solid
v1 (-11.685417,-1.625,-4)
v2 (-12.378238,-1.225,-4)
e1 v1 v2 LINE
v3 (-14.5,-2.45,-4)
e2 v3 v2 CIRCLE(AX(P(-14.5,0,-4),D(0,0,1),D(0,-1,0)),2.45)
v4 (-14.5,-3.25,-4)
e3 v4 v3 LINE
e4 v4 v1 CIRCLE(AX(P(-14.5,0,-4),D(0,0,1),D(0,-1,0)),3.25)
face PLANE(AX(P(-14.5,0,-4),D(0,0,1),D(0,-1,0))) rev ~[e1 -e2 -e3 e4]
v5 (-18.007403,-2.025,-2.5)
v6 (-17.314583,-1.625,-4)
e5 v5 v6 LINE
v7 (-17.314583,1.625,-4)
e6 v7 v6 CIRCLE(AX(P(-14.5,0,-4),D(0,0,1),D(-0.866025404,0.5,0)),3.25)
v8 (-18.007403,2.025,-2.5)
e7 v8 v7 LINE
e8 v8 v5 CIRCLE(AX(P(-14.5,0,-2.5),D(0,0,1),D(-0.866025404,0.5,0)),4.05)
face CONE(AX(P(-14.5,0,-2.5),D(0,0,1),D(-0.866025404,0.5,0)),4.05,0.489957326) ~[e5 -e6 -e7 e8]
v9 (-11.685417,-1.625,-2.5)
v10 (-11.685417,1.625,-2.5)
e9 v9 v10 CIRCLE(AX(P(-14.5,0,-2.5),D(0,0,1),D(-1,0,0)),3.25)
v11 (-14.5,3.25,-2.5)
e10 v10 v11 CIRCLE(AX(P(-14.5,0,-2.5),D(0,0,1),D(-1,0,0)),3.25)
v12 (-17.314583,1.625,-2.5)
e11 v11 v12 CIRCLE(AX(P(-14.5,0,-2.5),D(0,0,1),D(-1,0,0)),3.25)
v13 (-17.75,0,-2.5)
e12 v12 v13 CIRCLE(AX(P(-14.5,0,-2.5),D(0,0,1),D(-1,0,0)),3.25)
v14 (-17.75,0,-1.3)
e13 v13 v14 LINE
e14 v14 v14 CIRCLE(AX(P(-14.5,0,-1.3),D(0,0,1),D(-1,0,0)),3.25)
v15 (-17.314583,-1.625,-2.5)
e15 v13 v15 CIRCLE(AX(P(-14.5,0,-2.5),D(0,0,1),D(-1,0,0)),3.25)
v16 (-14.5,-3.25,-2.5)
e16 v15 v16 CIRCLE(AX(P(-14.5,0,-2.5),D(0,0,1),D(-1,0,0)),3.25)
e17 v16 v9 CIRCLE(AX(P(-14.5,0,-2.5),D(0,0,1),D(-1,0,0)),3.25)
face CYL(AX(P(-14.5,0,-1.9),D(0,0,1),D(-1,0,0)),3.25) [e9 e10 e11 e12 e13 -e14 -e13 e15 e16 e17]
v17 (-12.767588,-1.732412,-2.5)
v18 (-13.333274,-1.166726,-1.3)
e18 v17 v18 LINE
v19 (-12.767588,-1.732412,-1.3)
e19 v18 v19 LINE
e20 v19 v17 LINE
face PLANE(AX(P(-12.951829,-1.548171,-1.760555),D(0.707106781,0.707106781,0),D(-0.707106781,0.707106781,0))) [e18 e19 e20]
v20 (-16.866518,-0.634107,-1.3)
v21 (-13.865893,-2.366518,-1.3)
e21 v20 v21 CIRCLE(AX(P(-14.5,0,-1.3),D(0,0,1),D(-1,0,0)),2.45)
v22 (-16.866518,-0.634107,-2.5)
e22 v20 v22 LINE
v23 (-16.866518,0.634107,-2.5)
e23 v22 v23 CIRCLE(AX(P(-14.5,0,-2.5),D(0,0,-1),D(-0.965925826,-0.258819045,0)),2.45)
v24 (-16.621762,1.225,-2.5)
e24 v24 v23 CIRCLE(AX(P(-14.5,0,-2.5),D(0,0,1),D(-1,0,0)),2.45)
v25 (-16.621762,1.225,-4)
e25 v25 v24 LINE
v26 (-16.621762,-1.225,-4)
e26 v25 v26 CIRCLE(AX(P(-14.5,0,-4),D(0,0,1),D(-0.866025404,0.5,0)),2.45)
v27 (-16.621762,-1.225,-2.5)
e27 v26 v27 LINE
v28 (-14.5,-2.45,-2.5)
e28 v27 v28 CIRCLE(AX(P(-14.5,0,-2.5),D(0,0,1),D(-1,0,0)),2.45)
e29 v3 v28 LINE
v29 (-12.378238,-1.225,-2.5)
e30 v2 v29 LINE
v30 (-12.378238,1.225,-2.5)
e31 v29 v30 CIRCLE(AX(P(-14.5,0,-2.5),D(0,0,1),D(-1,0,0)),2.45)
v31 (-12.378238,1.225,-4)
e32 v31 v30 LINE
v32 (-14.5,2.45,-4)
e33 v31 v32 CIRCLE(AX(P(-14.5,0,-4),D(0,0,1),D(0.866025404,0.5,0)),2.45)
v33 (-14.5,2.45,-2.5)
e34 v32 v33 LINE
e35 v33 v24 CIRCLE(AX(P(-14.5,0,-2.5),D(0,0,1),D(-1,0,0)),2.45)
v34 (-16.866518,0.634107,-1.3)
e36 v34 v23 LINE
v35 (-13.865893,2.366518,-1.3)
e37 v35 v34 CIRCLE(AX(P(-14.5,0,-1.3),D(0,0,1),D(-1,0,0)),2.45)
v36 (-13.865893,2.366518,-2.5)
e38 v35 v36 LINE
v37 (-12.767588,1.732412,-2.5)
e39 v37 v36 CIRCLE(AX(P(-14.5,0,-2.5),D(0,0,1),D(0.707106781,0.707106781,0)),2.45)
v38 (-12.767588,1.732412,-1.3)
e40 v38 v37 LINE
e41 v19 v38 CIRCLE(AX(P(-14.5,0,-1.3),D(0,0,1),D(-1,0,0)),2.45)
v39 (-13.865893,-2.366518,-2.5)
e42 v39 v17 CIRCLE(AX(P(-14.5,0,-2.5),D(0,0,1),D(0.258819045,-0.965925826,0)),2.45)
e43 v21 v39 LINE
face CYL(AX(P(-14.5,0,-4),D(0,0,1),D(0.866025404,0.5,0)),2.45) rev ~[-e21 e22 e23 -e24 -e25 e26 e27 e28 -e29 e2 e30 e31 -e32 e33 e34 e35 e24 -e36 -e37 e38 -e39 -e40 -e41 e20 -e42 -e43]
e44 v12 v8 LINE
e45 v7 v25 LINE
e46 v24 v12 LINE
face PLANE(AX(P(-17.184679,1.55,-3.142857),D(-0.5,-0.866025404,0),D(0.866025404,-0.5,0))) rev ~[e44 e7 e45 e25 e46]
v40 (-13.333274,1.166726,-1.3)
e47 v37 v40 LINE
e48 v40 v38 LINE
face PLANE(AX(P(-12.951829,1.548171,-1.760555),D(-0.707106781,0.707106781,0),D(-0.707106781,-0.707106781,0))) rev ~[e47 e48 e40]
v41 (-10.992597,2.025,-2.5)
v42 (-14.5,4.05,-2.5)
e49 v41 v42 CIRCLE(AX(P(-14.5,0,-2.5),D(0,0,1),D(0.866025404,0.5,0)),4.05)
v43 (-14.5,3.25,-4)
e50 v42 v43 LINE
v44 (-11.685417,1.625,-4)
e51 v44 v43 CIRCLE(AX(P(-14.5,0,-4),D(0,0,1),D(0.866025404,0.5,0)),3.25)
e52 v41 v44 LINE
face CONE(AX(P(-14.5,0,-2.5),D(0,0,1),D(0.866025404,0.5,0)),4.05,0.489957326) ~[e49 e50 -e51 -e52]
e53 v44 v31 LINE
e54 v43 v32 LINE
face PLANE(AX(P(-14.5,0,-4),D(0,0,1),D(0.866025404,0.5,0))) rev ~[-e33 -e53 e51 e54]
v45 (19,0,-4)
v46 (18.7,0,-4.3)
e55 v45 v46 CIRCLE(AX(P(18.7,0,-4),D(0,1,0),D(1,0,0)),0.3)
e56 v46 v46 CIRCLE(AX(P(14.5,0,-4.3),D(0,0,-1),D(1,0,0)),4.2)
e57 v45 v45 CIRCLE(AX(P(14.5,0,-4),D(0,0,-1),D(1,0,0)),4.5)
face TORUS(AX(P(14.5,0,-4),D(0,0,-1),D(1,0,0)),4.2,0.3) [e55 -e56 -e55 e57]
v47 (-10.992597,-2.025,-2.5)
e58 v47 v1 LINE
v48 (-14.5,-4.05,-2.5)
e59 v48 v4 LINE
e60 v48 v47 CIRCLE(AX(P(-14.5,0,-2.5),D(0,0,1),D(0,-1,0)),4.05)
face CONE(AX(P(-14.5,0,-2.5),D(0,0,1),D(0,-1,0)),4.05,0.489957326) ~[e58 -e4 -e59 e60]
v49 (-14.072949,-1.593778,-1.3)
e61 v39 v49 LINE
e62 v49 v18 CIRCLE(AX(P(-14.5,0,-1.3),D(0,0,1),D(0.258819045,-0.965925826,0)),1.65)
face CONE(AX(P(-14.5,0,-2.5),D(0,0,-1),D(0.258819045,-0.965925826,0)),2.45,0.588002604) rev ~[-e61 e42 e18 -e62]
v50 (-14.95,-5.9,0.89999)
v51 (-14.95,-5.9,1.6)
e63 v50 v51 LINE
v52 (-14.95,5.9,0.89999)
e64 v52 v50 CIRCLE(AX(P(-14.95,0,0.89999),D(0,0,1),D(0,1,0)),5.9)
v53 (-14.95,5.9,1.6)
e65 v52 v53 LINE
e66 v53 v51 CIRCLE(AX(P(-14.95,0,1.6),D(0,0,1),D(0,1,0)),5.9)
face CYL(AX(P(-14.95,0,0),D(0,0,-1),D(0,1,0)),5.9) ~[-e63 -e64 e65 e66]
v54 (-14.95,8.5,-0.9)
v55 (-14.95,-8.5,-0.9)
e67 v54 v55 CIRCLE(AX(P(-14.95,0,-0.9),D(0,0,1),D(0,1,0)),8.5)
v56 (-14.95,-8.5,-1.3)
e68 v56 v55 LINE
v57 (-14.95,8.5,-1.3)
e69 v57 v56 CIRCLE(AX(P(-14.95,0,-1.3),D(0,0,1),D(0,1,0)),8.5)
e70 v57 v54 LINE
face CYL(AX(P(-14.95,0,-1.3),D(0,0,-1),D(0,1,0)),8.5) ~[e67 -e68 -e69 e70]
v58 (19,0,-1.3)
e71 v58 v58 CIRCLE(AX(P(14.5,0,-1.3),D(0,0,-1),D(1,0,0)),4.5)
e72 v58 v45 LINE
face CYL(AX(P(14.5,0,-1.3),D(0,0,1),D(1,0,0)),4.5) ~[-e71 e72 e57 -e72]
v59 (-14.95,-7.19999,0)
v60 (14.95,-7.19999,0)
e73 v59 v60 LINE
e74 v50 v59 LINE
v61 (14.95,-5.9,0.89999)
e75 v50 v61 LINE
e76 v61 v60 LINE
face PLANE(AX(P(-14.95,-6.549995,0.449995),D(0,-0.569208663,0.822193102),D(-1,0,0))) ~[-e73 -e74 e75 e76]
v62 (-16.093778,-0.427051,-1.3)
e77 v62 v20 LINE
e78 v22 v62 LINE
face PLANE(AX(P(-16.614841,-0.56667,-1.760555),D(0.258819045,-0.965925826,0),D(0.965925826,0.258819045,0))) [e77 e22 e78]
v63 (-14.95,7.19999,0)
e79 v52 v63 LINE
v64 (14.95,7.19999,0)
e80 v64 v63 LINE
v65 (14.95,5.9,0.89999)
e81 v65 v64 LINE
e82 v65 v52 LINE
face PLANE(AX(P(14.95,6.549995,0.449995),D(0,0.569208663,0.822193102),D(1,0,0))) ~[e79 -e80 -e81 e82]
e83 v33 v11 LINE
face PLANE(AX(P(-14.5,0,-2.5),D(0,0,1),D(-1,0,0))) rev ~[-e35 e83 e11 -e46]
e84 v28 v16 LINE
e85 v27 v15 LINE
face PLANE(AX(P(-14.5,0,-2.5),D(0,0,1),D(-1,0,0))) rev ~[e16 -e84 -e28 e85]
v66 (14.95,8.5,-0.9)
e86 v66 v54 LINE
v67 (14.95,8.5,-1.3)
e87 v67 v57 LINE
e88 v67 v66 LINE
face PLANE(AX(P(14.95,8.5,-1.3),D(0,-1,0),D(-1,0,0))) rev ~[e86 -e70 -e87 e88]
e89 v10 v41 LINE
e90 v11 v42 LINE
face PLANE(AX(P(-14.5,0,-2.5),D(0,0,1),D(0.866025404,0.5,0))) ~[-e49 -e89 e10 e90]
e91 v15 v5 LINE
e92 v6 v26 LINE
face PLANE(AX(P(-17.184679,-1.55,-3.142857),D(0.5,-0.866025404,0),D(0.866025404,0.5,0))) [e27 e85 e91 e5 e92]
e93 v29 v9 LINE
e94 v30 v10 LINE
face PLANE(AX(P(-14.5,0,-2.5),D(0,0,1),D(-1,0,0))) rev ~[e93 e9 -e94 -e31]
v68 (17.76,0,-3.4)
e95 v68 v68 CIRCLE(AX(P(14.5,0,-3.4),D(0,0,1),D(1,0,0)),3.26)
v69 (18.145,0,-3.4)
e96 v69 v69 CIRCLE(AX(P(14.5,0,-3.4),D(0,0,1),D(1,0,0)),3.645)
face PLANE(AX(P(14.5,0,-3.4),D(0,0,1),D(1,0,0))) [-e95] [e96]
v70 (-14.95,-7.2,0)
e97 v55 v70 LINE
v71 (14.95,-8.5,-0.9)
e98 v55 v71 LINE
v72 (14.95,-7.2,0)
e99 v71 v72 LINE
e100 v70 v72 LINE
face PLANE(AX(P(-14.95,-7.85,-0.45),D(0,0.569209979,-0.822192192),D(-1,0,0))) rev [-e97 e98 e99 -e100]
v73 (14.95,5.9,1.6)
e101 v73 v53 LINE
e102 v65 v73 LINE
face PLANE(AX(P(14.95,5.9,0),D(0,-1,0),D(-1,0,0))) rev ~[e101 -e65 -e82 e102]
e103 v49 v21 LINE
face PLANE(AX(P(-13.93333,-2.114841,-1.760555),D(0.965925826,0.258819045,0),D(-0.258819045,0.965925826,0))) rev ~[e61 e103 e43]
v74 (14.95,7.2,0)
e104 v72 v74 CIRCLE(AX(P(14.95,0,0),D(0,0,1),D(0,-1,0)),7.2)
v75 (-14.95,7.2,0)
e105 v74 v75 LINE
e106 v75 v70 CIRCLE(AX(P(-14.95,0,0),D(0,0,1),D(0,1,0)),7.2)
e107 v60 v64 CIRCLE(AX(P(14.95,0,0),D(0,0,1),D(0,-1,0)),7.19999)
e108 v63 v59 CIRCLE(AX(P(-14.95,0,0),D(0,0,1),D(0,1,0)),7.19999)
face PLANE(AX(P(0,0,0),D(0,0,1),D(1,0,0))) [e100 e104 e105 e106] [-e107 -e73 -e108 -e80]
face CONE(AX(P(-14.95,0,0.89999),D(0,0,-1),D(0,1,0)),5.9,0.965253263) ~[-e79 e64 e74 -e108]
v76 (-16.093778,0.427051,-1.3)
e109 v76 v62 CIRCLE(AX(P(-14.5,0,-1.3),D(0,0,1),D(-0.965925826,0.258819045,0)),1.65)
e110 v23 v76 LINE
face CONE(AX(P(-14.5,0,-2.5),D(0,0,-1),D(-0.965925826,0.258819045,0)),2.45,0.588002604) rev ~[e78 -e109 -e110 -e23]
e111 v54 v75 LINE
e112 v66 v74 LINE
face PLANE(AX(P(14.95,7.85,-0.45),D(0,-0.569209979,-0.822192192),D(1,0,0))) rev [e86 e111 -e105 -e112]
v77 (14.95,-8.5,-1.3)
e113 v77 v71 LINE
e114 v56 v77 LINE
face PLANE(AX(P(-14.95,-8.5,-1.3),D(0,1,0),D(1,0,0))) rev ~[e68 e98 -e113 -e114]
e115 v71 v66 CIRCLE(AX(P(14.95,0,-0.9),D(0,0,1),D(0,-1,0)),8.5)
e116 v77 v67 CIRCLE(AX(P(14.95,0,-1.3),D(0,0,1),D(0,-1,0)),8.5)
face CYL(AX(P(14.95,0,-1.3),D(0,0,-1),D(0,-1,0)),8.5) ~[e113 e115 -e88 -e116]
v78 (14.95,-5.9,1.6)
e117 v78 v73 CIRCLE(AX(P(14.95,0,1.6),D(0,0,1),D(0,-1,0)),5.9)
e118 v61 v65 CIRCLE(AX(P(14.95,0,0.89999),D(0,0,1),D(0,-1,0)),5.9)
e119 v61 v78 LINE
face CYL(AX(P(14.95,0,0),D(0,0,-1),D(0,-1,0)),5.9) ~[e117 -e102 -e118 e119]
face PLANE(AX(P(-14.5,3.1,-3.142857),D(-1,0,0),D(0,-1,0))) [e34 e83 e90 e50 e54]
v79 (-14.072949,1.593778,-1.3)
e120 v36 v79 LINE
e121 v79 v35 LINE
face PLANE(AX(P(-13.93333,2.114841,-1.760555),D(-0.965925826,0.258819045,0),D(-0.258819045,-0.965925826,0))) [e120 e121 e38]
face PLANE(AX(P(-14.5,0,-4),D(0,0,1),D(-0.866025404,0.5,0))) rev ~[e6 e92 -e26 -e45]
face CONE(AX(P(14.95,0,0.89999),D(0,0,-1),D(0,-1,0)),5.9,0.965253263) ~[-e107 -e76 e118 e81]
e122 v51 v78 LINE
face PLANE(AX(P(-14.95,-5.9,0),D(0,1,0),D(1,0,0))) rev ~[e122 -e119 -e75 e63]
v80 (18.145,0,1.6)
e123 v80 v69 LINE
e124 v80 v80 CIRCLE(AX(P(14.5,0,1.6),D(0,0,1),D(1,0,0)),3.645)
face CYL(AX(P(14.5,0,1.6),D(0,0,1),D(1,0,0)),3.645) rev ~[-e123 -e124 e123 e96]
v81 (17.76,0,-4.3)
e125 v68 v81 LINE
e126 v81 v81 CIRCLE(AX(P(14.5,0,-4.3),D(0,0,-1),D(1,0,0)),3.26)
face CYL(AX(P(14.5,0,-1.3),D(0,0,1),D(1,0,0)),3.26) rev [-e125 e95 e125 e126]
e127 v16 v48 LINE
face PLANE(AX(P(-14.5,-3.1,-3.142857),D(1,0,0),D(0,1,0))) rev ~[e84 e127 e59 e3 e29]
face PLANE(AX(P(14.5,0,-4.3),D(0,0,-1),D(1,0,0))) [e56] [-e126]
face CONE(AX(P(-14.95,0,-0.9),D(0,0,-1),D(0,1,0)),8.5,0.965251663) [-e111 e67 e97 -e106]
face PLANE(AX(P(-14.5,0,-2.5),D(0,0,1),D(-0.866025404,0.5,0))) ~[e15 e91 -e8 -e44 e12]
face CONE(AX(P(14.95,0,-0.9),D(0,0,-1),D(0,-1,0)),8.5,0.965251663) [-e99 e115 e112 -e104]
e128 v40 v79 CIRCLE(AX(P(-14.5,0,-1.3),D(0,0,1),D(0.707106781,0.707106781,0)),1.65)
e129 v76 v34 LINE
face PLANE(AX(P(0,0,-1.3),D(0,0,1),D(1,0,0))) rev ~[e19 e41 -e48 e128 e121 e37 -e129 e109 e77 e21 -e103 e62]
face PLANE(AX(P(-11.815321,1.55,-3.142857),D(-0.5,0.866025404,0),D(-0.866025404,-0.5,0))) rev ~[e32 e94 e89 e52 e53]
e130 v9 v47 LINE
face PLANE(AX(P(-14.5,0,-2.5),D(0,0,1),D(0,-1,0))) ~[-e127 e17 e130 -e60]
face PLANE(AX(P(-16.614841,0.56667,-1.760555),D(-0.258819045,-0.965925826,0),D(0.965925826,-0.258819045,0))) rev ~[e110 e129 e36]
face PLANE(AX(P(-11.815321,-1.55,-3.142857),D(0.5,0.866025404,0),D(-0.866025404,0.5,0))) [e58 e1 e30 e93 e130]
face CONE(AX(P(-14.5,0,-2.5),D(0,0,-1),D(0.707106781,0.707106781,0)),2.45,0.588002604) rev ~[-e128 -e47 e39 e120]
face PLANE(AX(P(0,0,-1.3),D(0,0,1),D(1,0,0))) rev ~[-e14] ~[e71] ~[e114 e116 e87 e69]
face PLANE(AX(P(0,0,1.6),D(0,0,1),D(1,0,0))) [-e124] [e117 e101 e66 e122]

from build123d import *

# Parameters (mm, degrees)
F1_DEPTH         = 1.6
F4_DEPTH         = 1.3
F5_SIZE2         = 1.3
F5_SIZE          = 0.9
F5_2_SIZE2       = 1.29999
F5_2_SIZE        = 0.89999
F6_R             = 4.5
F6_R_2           = 3.26
F7_DEPTH         = 3
F8_DEPTH         = 2.901
F9_R             = 3.645
F9_R_2           = 3.26
F10_DEPTH        = 5
F11_W            = 0.8
F11_H            = 1.2
F13_ANGLE_BACK   = 30
F13_ANGLE        = 60
F13_COPIES_COUNT = 3
F14_ANGLE_BACK   = 15
F14_ANGLE        = 30
F14_COPIES_COUNT = 3
F15_R            = 0.3


# Not quite as in the source:
# - a fillet or chamfer is up to 0.001 mm smaller than in the source, because OpenCascade refuses the exact size
# - after a boolean that leaves OpenCascade's solid faulty, fix() repairs it
# - a pattern or mirror of a feature is missing from the dataset's text; its kind, count and spacing are read off the source's solid


with BuildPart() as f1:
    # F0 (on Top) → F1 (new body)
    with BuildSketch(Plane.XY):
        with BuildLine():
            Line((14.95, 5.9), (-14.95, 5.9))
            ThreePointArc((-14.95, 5.9), (-20.85, 0), (-14.95, -5.9))
            Line((-14.95, -5.9), (14.95, -5.9))
            ThreePointArc((14.95, -5.9), (20.85, 0), (14.95, 5.9))
        make_face()
    extrude(amount=F1_DEPTH)

    # F3 (on offset) → F4 (join)
    with BuildSketch(Plane.XY.offset(-1.3)):
        with BuildLine():
            Line((14.95, 8.5), (-14.95, 8.5))
            ThreePointArc((-14.95, 8.5), (-23.45, 0), (-14.95, -8.5))
            Line((-14.95, -8.5), (14.95, -8.5))
            ThreePointArc((14.95, -8.5), (23.45, 0), (14.95, 8.5))
        make_face()
    extrude(amount=F4_DEPTH)

    # F5
    f5_edges = [f1.edges().sort_by_distance(p)[0] for p in [
        (0, 8.5, 0),
    ]]
    f5_side = f1.faces().sort_by_distance((0, 8.5, -0.65))[0]
    chamfer(f5_edges, length=F5_SIZE, length2=F5_SIZE2, reference=f5_side)

    # F5#2 (size 0.9 and 1.3 in the source; OpenCascade refuses exactly that, so slightly less here)
    f5_2_edges = [f1.edges().sort_by_distance(p)[0] for p in [
        (0, -5.9, 0),
    ]]
    f5_2_side = f1.faces().sort_by_distance((0, -5.9, 0.8))[0]
    chamfer(f5_2_edges, length=F5_2_SIZE, length2=F5_2_SIZE2, reference=f5_2_side)

    # F6 (on face) → F7 (join)
    with BuildSketch(Plane(origin=(0, 0, -1.3), x_dir=(1, 0, 0), z_dir=(0, 0, -1))):
        with Locations((14.5, 0)):
            Circle(F6_R)
        with Locations((14.5, 0)):
            Circle(F6_R_2, mode=Mode.SUBTRACT)
    extrude(amount=F7_DEPTH)

    # F8 (cut, through all): a face of the model
    f8_faces = [f1.faces().sort_by_distance(p)[0] for p in [
        (14.5, 0, -1.3),
    ]]
    extrude(f8_faces, amount=-F8_DEPTH, mode=Mode.SUBTRACT)

    # F9 (on face) → F10 (cut)
    with BuildSketch(Plane.XY.offset(1.6)):
        with Locations((14.5, 0)):
            Circle(F9_R)
        with Locations((14.5, 0)):
            Circle(F9_R_2, mode=Mode.SUBTRACT)
    extrude(amount=-F10_DEPTH, mode=Mode.SUBTRACT)

    # F11 (on Front) → F12 (revolve)
    with BuildSketch(Plane.XZ):
        with Locations((-17.35, -1.9)):
            Rectangle(F11_W, F11_H)
    revolve(axis=Axis((-14.5, 0, 1.6), (0, 0, 1)))

    # F11 (on Front) → F13 (revolve)
    with BuildSketch(Plane.XZ, mode=Mode.PRIVATE) as f13_sk:
        Polygon((-16.95, -4), (-16.95, -2.5), (-17.75, -2.5), (-18.55, -2.5), (-17.75, -4), align=None)
    f13 = revolve(f13_sk.sketch.rotate(Axis((-14.5, 0, 1.6), (0, 0, 1)), -F13_ANGLE_BACK), axis=Axis((-14.5, 0, 1.6), (0, 0, 1)), revolution_arc=F13_ANGLE)

    # F13_copies: F13 ×3 about axis
    f13_copies_axis = Axis((-14.5, 0, 0), (0, 0, 1))
    for i in range(1, F13_COPIES_COUNT):
        add(f13.rotate(f13_copies_axis, i * 360 / F13_COPIES_COUNT))

    # F11 (on Front) → F14 (revolve)
    with BuildSketch(Plane.XZ, mode=Mode.PRIVATE) as f14_sk:
        Polygon((-16.15, -1.3), (-16.95, -1.3), (-16.95, -2.5), align=None)
    f14 = revolve(f14_sk.sketch.rotate(Axis((-14.5, 0, 1.6), (0, 0, 1)), -F14_ANGLE_BACK), axis=Axis((-14.5, 0, 1.6), (0, 0, 1)), revolution_arc=F14_ANGLE)

    # F14_copies: F14 ×3 about axis
    f14_copies_axis = Axis((-14.5, 0, 0), (0, 0, 1))
    for i in range(1, F14_COPIES_COUNT):
        add(f14.rotate(f14_copies_axis, i * 360 / F14_COPIES_COUNT))

    add(f1.part.fix(), mode=Mode.REPLACE)

    # F15
    f15_edges = [f1.edges().sort_by_distance(p)[0] for p in [
        (10, 0, -4.3),
    ]]
    fillet(f15_edges, radius=F15_R)


solid = f1.part
